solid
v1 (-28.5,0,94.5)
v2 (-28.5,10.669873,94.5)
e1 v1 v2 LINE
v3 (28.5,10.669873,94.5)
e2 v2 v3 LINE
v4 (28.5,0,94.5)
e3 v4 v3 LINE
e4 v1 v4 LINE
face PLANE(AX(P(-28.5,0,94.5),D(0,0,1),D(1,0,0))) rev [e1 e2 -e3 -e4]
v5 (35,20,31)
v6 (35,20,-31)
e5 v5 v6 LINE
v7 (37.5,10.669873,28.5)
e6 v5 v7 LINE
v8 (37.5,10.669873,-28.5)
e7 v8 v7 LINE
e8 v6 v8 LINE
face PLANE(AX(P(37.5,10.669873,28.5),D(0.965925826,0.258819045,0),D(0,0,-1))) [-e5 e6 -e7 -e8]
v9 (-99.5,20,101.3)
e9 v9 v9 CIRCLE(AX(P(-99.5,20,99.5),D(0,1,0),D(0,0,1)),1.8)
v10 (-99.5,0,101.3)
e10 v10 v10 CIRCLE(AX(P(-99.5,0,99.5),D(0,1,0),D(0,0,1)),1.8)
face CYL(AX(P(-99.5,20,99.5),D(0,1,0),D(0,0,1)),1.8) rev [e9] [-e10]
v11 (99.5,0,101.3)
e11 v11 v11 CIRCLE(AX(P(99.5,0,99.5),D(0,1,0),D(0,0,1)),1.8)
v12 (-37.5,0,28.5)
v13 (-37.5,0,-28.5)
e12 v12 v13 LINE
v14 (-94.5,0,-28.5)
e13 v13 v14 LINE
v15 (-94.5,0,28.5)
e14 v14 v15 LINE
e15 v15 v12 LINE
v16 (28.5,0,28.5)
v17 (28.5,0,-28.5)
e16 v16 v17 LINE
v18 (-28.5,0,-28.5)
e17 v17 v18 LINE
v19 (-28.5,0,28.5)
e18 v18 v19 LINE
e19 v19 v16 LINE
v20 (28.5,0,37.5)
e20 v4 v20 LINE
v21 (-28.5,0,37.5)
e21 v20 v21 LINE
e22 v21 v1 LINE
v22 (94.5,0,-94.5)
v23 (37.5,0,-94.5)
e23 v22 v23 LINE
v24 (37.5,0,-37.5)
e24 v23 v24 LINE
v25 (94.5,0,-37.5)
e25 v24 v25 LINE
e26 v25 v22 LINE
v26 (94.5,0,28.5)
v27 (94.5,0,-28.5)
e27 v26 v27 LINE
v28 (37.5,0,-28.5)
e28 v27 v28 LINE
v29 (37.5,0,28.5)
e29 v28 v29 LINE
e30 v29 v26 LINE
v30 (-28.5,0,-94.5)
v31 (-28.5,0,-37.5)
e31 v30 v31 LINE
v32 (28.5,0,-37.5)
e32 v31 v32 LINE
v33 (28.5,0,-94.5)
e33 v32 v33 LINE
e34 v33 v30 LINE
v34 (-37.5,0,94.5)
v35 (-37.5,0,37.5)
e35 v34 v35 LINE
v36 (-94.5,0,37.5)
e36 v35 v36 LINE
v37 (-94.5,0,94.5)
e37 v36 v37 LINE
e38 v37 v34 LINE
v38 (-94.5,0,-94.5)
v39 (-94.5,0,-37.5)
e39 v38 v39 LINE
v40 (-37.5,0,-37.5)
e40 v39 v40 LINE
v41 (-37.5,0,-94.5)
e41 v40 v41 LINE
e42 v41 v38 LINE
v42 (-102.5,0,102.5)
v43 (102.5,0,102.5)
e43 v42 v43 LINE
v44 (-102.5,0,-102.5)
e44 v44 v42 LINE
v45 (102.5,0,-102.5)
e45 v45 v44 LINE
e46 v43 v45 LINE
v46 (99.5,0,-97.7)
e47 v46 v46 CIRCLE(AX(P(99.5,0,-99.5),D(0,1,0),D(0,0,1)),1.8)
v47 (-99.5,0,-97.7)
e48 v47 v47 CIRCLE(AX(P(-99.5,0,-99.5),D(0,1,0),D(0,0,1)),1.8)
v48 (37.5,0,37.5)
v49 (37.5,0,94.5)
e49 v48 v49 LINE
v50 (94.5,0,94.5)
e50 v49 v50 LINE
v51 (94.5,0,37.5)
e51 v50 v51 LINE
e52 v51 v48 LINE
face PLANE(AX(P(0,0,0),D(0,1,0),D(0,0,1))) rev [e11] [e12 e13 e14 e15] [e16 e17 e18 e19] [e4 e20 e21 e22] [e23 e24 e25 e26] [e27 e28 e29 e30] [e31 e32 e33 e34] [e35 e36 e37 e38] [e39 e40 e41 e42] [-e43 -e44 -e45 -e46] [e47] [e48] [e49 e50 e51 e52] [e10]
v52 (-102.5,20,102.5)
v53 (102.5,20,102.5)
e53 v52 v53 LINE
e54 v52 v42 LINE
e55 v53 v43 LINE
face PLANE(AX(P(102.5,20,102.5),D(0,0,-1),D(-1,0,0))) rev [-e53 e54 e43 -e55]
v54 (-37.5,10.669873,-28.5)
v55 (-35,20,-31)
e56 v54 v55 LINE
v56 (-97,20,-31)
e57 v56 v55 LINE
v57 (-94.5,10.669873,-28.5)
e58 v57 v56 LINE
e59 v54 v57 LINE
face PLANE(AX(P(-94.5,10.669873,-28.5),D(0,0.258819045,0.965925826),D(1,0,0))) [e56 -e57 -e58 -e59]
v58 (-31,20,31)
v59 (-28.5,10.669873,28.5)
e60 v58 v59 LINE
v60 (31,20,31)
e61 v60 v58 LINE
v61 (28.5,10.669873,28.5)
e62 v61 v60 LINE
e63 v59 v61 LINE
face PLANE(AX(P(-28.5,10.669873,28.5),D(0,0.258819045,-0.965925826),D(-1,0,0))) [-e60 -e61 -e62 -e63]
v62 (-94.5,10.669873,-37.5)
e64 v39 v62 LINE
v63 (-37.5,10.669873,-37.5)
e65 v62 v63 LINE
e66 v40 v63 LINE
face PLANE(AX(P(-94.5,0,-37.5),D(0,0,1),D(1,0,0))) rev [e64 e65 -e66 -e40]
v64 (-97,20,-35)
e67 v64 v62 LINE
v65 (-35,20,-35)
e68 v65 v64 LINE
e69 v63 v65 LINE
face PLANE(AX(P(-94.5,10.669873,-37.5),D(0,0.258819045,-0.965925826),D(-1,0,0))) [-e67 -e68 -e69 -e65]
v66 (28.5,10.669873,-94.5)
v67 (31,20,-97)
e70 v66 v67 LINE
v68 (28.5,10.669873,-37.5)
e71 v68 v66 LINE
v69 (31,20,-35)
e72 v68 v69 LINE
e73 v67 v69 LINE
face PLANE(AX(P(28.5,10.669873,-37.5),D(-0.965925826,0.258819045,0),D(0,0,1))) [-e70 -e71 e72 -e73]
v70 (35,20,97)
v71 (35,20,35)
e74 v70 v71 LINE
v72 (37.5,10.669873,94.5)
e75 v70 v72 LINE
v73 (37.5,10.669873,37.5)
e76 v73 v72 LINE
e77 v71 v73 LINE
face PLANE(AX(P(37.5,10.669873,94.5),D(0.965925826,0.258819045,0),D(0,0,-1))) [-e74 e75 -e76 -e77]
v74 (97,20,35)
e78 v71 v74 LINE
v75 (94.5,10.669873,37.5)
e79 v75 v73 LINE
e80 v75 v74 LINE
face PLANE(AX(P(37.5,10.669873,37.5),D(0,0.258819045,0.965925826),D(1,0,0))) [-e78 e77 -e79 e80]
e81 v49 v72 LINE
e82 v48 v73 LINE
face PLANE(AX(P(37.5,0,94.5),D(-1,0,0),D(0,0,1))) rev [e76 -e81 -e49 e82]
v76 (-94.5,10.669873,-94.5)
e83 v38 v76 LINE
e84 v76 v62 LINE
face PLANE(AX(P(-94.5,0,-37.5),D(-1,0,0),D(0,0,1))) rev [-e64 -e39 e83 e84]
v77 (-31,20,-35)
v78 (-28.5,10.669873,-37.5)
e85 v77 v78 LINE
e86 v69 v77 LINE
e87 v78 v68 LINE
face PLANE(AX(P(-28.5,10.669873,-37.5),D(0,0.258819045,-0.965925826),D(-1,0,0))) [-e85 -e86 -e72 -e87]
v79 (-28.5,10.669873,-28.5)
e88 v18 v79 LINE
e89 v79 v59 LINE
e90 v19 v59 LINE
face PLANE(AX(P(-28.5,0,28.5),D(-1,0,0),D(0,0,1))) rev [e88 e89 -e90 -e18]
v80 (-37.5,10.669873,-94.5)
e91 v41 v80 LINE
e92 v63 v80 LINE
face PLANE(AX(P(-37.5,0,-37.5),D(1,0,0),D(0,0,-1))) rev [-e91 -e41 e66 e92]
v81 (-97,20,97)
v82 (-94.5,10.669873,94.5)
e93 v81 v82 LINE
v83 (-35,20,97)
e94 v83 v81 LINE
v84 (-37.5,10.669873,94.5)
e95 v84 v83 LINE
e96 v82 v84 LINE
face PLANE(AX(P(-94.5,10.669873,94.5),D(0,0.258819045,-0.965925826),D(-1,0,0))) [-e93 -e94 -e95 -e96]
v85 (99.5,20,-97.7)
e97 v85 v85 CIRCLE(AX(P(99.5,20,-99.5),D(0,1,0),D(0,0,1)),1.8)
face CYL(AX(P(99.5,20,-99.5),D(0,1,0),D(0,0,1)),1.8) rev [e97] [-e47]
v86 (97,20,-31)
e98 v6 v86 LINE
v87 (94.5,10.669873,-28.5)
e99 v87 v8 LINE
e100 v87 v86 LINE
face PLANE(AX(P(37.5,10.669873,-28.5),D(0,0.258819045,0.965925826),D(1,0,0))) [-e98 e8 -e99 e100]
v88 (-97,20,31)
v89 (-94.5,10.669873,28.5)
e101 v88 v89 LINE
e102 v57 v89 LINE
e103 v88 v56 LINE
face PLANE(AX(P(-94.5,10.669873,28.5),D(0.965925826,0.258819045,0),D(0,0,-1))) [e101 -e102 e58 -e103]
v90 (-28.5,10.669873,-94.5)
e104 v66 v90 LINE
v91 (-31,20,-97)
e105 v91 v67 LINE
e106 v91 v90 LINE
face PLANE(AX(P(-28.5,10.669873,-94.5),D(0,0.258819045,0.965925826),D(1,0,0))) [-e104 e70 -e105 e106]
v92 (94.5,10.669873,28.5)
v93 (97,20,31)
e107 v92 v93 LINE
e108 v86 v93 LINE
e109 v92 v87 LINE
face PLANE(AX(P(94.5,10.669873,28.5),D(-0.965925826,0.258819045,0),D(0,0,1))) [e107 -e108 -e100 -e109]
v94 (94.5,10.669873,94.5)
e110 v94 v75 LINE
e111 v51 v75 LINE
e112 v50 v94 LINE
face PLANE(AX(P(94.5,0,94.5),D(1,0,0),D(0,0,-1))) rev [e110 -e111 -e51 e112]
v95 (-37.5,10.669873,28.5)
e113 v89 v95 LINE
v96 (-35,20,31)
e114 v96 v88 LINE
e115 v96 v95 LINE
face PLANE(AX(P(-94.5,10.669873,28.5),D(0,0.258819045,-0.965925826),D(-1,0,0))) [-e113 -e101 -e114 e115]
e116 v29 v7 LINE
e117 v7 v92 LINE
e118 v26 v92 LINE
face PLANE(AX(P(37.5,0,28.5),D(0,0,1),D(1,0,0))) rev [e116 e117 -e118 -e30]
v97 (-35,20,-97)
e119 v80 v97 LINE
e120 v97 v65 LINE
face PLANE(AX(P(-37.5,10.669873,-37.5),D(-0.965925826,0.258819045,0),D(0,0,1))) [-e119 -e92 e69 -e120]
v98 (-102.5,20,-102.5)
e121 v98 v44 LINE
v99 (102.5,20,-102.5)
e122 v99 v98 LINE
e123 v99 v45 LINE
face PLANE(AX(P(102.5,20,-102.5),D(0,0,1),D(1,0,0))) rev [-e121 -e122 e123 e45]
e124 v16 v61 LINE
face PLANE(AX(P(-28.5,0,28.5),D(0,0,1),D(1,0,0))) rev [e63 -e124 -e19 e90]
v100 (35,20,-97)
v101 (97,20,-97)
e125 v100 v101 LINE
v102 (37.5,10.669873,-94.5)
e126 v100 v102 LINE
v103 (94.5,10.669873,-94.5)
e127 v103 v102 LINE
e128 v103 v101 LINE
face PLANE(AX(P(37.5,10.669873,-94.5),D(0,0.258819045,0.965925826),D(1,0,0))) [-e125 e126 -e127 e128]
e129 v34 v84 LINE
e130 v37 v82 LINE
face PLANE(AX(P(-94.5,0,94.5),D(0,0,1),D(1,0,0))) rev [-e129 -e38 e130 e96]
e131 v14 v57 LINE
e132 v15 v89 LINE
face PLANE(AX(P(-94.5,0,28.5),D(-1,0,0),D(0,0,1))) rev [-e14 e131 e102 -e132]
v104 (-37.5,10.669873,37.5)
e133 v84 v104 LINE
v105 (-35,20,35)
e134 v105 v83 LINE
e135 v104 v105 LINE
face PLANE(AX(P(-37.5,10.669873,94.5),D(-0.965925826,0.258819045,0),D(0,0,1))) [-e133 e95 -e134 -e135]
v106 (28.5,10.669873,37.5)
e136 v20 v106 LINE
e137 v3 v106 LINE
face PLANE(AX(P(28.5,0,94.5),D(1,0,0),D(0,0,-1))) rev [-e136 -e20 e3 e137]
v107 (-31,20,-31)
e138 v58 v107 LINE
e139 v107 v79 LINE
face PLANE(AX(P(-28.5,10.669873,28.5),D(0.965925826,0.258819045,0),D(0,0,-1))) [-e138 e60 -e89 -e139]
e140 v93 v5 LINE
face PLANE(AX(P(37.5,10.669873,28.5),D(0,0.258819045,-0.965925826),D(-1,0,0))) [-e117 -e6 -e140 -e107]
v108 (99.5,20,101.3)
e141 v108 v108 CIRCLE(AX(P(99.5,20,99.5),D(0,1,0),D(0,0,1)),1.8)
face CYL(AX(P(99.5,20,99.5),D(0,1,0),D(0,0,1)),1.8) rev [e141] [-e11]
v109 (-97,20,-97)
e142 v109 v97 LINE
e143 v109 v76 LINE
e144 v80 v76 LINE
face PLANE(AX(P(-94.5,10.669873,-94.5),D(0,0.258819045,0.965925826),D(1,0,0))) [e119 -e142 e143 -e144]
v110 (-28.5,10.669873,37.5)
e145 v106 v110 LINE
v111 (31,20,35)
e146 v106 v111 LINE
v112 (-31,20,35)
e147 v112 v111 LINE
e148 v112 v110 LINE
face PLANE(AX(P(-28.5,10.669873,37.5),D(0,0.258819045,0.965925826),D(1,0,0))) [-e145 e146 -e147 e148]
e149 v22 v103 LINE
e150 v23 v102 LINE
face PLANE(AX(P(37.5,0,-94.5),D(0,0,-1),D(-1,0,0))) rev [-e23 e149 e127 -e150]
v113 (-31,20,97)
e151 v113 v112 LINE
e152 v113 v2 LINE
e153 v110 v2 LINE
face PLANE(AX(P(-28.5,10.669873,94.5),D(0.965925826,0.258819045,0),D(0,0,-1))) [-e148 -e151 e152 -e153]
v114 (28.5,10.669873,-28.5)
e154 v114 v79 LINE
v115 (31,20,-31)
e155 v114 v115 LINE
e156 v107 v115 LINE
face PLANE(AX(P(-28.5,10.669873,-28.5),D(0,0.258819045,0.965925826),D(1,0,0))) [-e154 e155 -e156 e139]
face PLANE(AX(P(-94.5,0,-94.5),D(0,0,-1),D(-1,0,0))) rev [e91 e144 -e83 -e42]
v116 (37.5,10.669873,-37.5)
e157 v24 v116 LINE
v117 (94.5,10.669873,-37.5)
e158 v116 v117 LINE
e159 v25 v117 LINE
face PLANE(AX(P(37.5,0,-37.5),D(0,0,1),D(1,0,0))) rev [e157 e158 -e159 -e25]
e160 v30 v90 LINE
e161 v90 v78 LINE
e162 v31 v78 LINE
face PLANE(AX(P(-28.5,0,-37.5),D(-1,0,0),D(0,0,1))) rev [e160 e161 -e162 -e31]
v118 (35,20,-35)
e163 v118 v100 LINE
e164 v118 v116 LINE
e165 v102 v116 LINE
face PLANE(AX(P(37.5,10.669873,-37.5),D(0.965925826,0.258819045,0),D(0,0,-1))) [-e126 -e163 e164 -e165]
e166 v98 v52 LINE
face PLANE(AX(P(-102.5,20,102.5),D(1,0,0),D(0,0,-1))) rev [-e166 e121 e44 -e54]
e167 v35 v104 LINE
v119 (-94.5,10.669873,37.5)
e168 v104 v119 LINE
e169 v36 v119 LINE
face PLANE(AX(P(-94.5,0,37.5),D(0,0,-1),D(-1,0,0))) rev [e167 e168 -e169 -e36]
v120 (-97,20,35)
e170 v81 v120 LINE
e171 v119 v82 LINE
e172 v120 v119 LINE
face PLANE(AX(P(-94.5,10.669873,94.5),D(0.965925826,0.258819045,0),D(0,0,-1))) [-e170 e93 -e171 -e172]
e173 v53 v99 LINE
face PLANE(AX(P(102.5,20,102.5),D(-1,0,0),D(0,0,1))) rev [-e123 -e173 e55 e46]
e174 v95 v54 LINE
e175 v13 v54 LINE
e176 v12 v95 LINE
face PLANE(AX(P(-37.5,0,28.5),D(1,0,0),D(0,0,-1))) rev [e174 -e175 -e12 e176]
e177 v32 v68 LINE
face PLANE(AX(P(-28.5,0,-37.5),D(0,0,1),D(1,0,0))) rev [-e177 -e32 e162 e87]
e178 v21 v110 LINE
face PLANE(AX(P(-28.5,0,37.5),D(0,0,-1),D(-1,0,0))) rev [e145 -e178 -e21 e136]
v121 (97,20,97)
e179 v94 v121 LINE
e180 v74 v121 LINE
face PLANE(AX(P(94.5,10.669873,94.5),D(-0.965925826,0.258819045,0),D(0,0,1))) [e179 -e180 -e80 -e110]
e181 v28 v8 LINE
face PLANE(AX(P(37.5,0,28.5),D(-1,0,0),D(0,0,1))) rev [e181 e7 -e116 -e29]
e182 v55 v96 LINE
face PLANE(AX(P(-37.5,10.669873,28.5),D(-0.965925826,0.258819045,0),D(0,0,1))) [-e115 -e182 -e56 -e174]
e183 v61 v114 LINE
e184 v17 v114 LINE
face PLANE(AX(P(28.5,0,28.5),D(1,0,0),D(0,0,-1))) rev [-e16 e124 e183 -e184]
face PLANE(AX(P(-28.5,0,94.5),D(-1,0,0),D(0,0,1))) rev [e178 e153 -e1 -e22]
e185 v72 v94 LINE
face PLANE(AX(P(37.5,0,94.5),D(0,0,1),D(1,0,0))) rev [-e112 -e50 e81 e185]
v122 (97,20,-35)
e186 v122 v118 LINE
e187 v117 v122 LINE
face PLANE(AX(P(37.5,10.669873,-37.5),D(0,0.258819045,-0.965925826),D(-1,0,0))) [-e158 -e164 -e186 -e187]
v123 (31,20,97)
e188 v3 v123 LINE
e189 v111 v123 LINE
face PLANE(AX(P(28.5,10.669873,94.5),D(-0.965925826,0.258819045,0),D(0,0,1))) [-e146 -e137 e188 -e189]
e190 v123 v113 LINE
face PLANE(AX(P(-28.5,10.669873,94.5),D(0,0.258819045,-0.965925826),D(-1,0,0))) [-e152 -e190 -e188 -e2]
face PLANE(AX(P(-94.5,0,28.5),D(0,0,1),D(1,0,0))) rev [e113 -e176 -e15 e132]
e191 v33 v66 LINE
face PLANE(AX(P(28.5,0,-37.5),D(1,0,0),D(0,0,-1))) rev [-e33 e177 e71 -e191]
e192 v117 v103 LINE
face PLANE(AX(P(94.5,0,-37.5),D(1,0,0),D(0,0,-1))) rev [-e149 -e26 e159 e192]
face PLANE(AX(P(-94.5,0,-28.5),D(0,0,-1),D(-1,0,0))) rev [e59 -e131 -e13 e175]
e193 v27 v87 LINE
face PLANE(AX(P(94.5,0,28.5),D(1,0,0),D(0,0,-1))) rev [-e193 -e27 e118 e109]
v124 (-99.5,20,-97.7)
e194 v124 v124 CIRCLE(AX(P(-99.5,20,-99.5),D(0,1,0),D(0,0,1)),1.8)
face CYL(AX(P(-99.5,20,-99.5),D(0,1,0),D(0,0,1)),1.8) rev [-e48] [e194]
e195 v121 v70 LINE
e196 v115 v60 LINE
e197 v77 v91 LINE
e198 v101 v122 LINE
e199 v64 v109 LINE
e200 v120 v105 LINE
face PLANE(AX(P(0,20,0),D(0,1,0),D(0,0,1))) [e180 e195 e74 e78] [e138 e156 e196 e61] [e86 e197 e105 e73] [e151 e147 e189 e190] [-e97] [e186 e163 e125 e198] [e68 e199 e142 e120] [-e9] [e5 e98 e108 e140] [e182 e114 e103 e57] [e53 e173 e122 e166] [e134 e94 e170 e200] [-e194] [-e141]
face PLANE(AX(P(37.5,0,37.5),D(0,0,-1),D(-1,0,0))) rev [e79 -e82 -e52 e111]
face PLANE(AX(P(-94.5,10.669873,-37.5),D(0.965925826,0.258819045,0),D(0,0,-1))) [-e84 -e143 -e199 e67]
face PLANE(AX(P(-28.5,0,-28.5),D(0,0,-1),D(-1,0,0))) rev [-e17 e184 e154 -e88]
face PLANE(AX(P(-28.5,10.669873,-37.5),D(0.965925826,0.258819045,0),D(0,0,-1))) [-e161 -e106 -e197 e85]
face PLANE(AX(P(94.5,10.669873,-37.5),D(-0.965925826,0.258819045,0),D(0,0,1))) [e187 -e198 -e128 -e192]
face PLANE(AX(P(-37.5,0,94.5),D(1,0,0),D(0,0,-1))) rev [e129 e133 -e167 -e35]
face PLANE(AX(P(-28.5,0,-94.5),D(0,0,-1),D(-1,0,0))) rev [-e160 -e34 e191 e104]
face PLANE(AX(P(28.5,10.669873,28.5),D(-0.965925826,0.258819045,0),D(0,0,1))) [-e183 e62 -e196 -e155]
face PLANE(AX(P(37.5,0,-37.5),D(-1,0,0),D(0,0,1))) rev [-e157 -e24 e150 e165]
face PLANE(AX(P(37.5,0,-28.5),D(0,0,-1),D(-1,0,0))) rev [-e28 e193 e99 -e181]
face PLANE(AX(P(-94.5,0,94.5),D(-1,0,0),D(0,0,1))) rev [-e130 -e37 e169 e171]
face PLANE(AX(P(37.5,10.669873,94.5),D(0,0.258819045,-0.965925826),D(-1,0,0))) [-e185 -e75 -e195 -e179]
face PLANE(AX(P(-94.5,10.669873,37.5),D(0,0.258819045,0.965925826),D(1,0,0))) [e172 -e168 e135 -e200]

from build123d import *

# Parameters (mm, degrees)
SKETCH2_W                    = 205
SKETCH2_H                    = 205
BOSS_EXTRUDE1_DEPTH          = 20
SKETCH3_W                    = 57
SKETCH3_H                    = 57
CUT_EXTRUDE1_DEPTH           = 147.330106267
LPATTERN1_COUNT              = 3
LPATTERN1_PITCH              = 66
LPATTERN1_COUNT_DIR2         = 3
LPATTERN1_PITCH_DIR2         = 66
CHAMFER1_SIZE                = 2.5
CHAMFER1_SIZE2               = 9.330127019
M3_CLEARANCE_HOLE1_OUTLINE_R = 1.8
M3_CLEARANCE_HOLE1_DEPTH     = 20


# Read off the part's stored shape, not the designer's step: M3 Clearance Hole1
with BuildPart() as part:
    # Sketch2 → Boss-Extrude1 (new body)
    with BuildSketch(Plane(origin=(0, 0, 0), x_dir=(1, 0, 0), z_dir=(0, 1, 0))):
        Rectangle(SKETCH2_W, SKETCH2_H)
    extrude(amount=BOSS_EXTRUDE1_DEPTH)

    # Sketch3 → Cut-Extrude1 (cut, through all)
    with BuildSketch(Plane(origin=(0, 20, 0), x_dir=(1, 0, 0), z_dir=(0, 1, 0))):
        with Locations((-66, 66)):
            Rectangle(SKETCH3_W, SKETCH3_H)
    cut_extrude1 = extrude(amount=-CUT_EXTRUDE1_DEPTH, mode=Mode.SUBTRACT)

    # LPattern1: Cut-Extrude1 3 × 3
    with Locations(*[(i * LPATTERN1_PITCH, 0, j * LPATTERN1_PITCH_DIR2) for i in range(LPATTERN1_COUNT) for j in range(LPATTERN1_COUNT_DIR2) if (i, j) != (0, 0)]):
        add(cut_extrude1, mode=Mode.SUBTRACT)

    # Chamfer1
    chamfer1_edges = [part.edges().sort_by_distance(p)[0] for p in [
        (94.5, 20, 66),
        (66, 20, 94.5),
        (37.5, 20, 66),
        (66, 20, 37.5),
        (-37.5, 20, -66),
        (-66, 20, -94.5),
        (-94.5, 20, -66),
        (-66, 20, -37.5),
        (28.5, 20, -66),
        (0, 20, -94.5),
        (-28.5, 20, -66),
        (0, 20, -37.5),
        (94.5, 20, -66),
        (66, 20, -37.5),
        (37.5, 20, -66),
        (66, 20, -94.5),
        (-37.5, 20, 0),
        (-66, 20, 28.5),
        (-94.5, 20, 0),
        (-66, 20, -28.5),
        (28.5, 20, 0),
        (0, 20, 28.5),
        (-28.5, 20, 0),
        (0, 20, -28.5),
        (94.5, 20, 0),
        (66, 20, 28.5),
        (37.5, 20, 0),
        (66, 20, -28.5),
        (-37.5, 20, 66),
        (-66, 20, 94.5),
        (-94.5, 20, 66),
        (-66, 20, 37.5),
        (28.5, 20, 66),
        (0, 20, 94.5),
        (-28.5, 20, 66),
        (0, 20, 37.5),
    ]]
    chamfer1_side = [part.faces().sort_by_distance(p)[0] for p in [
        (0, 20, 99.600862197),
    ]]
    chamfer(chamfer1_edges, length=CHAMFER1_SIZE, length2=CHAMFER1_SIZE2, reference=chamfer1_side[0])

    # M3 Clearance Hole1 outline → M3 Clearance Hole1 (cut)
    with BuildSketch(Plane(origin=(0, 0, 0), x_dir=(1, 0, 0), z_dir=(0, 1, 0))):
        with Locations((-99.5, -99.5)):
            Circle(M3_CLEARANCE_HOLE1_OUTLINE_R)
        with Locations((99.5, 99.5)):
            Circle(M3_CLEARANCE_HOLE1_OUTLINE_R)
        with Locations((99.5, -99.5)):
            Circle(M3_CLEARANCE_HOLE1_OUTLINE_R)
        with Locations((-99.5, 99.5)):
            Circle(M3_CLEARANCE_HOLE1_OUTLINE_R)
    extrude(amount=M3_CLEARANCE_HOLE1_DEPTH, mode=Mode.SUBTRACT)


solid = part.part
